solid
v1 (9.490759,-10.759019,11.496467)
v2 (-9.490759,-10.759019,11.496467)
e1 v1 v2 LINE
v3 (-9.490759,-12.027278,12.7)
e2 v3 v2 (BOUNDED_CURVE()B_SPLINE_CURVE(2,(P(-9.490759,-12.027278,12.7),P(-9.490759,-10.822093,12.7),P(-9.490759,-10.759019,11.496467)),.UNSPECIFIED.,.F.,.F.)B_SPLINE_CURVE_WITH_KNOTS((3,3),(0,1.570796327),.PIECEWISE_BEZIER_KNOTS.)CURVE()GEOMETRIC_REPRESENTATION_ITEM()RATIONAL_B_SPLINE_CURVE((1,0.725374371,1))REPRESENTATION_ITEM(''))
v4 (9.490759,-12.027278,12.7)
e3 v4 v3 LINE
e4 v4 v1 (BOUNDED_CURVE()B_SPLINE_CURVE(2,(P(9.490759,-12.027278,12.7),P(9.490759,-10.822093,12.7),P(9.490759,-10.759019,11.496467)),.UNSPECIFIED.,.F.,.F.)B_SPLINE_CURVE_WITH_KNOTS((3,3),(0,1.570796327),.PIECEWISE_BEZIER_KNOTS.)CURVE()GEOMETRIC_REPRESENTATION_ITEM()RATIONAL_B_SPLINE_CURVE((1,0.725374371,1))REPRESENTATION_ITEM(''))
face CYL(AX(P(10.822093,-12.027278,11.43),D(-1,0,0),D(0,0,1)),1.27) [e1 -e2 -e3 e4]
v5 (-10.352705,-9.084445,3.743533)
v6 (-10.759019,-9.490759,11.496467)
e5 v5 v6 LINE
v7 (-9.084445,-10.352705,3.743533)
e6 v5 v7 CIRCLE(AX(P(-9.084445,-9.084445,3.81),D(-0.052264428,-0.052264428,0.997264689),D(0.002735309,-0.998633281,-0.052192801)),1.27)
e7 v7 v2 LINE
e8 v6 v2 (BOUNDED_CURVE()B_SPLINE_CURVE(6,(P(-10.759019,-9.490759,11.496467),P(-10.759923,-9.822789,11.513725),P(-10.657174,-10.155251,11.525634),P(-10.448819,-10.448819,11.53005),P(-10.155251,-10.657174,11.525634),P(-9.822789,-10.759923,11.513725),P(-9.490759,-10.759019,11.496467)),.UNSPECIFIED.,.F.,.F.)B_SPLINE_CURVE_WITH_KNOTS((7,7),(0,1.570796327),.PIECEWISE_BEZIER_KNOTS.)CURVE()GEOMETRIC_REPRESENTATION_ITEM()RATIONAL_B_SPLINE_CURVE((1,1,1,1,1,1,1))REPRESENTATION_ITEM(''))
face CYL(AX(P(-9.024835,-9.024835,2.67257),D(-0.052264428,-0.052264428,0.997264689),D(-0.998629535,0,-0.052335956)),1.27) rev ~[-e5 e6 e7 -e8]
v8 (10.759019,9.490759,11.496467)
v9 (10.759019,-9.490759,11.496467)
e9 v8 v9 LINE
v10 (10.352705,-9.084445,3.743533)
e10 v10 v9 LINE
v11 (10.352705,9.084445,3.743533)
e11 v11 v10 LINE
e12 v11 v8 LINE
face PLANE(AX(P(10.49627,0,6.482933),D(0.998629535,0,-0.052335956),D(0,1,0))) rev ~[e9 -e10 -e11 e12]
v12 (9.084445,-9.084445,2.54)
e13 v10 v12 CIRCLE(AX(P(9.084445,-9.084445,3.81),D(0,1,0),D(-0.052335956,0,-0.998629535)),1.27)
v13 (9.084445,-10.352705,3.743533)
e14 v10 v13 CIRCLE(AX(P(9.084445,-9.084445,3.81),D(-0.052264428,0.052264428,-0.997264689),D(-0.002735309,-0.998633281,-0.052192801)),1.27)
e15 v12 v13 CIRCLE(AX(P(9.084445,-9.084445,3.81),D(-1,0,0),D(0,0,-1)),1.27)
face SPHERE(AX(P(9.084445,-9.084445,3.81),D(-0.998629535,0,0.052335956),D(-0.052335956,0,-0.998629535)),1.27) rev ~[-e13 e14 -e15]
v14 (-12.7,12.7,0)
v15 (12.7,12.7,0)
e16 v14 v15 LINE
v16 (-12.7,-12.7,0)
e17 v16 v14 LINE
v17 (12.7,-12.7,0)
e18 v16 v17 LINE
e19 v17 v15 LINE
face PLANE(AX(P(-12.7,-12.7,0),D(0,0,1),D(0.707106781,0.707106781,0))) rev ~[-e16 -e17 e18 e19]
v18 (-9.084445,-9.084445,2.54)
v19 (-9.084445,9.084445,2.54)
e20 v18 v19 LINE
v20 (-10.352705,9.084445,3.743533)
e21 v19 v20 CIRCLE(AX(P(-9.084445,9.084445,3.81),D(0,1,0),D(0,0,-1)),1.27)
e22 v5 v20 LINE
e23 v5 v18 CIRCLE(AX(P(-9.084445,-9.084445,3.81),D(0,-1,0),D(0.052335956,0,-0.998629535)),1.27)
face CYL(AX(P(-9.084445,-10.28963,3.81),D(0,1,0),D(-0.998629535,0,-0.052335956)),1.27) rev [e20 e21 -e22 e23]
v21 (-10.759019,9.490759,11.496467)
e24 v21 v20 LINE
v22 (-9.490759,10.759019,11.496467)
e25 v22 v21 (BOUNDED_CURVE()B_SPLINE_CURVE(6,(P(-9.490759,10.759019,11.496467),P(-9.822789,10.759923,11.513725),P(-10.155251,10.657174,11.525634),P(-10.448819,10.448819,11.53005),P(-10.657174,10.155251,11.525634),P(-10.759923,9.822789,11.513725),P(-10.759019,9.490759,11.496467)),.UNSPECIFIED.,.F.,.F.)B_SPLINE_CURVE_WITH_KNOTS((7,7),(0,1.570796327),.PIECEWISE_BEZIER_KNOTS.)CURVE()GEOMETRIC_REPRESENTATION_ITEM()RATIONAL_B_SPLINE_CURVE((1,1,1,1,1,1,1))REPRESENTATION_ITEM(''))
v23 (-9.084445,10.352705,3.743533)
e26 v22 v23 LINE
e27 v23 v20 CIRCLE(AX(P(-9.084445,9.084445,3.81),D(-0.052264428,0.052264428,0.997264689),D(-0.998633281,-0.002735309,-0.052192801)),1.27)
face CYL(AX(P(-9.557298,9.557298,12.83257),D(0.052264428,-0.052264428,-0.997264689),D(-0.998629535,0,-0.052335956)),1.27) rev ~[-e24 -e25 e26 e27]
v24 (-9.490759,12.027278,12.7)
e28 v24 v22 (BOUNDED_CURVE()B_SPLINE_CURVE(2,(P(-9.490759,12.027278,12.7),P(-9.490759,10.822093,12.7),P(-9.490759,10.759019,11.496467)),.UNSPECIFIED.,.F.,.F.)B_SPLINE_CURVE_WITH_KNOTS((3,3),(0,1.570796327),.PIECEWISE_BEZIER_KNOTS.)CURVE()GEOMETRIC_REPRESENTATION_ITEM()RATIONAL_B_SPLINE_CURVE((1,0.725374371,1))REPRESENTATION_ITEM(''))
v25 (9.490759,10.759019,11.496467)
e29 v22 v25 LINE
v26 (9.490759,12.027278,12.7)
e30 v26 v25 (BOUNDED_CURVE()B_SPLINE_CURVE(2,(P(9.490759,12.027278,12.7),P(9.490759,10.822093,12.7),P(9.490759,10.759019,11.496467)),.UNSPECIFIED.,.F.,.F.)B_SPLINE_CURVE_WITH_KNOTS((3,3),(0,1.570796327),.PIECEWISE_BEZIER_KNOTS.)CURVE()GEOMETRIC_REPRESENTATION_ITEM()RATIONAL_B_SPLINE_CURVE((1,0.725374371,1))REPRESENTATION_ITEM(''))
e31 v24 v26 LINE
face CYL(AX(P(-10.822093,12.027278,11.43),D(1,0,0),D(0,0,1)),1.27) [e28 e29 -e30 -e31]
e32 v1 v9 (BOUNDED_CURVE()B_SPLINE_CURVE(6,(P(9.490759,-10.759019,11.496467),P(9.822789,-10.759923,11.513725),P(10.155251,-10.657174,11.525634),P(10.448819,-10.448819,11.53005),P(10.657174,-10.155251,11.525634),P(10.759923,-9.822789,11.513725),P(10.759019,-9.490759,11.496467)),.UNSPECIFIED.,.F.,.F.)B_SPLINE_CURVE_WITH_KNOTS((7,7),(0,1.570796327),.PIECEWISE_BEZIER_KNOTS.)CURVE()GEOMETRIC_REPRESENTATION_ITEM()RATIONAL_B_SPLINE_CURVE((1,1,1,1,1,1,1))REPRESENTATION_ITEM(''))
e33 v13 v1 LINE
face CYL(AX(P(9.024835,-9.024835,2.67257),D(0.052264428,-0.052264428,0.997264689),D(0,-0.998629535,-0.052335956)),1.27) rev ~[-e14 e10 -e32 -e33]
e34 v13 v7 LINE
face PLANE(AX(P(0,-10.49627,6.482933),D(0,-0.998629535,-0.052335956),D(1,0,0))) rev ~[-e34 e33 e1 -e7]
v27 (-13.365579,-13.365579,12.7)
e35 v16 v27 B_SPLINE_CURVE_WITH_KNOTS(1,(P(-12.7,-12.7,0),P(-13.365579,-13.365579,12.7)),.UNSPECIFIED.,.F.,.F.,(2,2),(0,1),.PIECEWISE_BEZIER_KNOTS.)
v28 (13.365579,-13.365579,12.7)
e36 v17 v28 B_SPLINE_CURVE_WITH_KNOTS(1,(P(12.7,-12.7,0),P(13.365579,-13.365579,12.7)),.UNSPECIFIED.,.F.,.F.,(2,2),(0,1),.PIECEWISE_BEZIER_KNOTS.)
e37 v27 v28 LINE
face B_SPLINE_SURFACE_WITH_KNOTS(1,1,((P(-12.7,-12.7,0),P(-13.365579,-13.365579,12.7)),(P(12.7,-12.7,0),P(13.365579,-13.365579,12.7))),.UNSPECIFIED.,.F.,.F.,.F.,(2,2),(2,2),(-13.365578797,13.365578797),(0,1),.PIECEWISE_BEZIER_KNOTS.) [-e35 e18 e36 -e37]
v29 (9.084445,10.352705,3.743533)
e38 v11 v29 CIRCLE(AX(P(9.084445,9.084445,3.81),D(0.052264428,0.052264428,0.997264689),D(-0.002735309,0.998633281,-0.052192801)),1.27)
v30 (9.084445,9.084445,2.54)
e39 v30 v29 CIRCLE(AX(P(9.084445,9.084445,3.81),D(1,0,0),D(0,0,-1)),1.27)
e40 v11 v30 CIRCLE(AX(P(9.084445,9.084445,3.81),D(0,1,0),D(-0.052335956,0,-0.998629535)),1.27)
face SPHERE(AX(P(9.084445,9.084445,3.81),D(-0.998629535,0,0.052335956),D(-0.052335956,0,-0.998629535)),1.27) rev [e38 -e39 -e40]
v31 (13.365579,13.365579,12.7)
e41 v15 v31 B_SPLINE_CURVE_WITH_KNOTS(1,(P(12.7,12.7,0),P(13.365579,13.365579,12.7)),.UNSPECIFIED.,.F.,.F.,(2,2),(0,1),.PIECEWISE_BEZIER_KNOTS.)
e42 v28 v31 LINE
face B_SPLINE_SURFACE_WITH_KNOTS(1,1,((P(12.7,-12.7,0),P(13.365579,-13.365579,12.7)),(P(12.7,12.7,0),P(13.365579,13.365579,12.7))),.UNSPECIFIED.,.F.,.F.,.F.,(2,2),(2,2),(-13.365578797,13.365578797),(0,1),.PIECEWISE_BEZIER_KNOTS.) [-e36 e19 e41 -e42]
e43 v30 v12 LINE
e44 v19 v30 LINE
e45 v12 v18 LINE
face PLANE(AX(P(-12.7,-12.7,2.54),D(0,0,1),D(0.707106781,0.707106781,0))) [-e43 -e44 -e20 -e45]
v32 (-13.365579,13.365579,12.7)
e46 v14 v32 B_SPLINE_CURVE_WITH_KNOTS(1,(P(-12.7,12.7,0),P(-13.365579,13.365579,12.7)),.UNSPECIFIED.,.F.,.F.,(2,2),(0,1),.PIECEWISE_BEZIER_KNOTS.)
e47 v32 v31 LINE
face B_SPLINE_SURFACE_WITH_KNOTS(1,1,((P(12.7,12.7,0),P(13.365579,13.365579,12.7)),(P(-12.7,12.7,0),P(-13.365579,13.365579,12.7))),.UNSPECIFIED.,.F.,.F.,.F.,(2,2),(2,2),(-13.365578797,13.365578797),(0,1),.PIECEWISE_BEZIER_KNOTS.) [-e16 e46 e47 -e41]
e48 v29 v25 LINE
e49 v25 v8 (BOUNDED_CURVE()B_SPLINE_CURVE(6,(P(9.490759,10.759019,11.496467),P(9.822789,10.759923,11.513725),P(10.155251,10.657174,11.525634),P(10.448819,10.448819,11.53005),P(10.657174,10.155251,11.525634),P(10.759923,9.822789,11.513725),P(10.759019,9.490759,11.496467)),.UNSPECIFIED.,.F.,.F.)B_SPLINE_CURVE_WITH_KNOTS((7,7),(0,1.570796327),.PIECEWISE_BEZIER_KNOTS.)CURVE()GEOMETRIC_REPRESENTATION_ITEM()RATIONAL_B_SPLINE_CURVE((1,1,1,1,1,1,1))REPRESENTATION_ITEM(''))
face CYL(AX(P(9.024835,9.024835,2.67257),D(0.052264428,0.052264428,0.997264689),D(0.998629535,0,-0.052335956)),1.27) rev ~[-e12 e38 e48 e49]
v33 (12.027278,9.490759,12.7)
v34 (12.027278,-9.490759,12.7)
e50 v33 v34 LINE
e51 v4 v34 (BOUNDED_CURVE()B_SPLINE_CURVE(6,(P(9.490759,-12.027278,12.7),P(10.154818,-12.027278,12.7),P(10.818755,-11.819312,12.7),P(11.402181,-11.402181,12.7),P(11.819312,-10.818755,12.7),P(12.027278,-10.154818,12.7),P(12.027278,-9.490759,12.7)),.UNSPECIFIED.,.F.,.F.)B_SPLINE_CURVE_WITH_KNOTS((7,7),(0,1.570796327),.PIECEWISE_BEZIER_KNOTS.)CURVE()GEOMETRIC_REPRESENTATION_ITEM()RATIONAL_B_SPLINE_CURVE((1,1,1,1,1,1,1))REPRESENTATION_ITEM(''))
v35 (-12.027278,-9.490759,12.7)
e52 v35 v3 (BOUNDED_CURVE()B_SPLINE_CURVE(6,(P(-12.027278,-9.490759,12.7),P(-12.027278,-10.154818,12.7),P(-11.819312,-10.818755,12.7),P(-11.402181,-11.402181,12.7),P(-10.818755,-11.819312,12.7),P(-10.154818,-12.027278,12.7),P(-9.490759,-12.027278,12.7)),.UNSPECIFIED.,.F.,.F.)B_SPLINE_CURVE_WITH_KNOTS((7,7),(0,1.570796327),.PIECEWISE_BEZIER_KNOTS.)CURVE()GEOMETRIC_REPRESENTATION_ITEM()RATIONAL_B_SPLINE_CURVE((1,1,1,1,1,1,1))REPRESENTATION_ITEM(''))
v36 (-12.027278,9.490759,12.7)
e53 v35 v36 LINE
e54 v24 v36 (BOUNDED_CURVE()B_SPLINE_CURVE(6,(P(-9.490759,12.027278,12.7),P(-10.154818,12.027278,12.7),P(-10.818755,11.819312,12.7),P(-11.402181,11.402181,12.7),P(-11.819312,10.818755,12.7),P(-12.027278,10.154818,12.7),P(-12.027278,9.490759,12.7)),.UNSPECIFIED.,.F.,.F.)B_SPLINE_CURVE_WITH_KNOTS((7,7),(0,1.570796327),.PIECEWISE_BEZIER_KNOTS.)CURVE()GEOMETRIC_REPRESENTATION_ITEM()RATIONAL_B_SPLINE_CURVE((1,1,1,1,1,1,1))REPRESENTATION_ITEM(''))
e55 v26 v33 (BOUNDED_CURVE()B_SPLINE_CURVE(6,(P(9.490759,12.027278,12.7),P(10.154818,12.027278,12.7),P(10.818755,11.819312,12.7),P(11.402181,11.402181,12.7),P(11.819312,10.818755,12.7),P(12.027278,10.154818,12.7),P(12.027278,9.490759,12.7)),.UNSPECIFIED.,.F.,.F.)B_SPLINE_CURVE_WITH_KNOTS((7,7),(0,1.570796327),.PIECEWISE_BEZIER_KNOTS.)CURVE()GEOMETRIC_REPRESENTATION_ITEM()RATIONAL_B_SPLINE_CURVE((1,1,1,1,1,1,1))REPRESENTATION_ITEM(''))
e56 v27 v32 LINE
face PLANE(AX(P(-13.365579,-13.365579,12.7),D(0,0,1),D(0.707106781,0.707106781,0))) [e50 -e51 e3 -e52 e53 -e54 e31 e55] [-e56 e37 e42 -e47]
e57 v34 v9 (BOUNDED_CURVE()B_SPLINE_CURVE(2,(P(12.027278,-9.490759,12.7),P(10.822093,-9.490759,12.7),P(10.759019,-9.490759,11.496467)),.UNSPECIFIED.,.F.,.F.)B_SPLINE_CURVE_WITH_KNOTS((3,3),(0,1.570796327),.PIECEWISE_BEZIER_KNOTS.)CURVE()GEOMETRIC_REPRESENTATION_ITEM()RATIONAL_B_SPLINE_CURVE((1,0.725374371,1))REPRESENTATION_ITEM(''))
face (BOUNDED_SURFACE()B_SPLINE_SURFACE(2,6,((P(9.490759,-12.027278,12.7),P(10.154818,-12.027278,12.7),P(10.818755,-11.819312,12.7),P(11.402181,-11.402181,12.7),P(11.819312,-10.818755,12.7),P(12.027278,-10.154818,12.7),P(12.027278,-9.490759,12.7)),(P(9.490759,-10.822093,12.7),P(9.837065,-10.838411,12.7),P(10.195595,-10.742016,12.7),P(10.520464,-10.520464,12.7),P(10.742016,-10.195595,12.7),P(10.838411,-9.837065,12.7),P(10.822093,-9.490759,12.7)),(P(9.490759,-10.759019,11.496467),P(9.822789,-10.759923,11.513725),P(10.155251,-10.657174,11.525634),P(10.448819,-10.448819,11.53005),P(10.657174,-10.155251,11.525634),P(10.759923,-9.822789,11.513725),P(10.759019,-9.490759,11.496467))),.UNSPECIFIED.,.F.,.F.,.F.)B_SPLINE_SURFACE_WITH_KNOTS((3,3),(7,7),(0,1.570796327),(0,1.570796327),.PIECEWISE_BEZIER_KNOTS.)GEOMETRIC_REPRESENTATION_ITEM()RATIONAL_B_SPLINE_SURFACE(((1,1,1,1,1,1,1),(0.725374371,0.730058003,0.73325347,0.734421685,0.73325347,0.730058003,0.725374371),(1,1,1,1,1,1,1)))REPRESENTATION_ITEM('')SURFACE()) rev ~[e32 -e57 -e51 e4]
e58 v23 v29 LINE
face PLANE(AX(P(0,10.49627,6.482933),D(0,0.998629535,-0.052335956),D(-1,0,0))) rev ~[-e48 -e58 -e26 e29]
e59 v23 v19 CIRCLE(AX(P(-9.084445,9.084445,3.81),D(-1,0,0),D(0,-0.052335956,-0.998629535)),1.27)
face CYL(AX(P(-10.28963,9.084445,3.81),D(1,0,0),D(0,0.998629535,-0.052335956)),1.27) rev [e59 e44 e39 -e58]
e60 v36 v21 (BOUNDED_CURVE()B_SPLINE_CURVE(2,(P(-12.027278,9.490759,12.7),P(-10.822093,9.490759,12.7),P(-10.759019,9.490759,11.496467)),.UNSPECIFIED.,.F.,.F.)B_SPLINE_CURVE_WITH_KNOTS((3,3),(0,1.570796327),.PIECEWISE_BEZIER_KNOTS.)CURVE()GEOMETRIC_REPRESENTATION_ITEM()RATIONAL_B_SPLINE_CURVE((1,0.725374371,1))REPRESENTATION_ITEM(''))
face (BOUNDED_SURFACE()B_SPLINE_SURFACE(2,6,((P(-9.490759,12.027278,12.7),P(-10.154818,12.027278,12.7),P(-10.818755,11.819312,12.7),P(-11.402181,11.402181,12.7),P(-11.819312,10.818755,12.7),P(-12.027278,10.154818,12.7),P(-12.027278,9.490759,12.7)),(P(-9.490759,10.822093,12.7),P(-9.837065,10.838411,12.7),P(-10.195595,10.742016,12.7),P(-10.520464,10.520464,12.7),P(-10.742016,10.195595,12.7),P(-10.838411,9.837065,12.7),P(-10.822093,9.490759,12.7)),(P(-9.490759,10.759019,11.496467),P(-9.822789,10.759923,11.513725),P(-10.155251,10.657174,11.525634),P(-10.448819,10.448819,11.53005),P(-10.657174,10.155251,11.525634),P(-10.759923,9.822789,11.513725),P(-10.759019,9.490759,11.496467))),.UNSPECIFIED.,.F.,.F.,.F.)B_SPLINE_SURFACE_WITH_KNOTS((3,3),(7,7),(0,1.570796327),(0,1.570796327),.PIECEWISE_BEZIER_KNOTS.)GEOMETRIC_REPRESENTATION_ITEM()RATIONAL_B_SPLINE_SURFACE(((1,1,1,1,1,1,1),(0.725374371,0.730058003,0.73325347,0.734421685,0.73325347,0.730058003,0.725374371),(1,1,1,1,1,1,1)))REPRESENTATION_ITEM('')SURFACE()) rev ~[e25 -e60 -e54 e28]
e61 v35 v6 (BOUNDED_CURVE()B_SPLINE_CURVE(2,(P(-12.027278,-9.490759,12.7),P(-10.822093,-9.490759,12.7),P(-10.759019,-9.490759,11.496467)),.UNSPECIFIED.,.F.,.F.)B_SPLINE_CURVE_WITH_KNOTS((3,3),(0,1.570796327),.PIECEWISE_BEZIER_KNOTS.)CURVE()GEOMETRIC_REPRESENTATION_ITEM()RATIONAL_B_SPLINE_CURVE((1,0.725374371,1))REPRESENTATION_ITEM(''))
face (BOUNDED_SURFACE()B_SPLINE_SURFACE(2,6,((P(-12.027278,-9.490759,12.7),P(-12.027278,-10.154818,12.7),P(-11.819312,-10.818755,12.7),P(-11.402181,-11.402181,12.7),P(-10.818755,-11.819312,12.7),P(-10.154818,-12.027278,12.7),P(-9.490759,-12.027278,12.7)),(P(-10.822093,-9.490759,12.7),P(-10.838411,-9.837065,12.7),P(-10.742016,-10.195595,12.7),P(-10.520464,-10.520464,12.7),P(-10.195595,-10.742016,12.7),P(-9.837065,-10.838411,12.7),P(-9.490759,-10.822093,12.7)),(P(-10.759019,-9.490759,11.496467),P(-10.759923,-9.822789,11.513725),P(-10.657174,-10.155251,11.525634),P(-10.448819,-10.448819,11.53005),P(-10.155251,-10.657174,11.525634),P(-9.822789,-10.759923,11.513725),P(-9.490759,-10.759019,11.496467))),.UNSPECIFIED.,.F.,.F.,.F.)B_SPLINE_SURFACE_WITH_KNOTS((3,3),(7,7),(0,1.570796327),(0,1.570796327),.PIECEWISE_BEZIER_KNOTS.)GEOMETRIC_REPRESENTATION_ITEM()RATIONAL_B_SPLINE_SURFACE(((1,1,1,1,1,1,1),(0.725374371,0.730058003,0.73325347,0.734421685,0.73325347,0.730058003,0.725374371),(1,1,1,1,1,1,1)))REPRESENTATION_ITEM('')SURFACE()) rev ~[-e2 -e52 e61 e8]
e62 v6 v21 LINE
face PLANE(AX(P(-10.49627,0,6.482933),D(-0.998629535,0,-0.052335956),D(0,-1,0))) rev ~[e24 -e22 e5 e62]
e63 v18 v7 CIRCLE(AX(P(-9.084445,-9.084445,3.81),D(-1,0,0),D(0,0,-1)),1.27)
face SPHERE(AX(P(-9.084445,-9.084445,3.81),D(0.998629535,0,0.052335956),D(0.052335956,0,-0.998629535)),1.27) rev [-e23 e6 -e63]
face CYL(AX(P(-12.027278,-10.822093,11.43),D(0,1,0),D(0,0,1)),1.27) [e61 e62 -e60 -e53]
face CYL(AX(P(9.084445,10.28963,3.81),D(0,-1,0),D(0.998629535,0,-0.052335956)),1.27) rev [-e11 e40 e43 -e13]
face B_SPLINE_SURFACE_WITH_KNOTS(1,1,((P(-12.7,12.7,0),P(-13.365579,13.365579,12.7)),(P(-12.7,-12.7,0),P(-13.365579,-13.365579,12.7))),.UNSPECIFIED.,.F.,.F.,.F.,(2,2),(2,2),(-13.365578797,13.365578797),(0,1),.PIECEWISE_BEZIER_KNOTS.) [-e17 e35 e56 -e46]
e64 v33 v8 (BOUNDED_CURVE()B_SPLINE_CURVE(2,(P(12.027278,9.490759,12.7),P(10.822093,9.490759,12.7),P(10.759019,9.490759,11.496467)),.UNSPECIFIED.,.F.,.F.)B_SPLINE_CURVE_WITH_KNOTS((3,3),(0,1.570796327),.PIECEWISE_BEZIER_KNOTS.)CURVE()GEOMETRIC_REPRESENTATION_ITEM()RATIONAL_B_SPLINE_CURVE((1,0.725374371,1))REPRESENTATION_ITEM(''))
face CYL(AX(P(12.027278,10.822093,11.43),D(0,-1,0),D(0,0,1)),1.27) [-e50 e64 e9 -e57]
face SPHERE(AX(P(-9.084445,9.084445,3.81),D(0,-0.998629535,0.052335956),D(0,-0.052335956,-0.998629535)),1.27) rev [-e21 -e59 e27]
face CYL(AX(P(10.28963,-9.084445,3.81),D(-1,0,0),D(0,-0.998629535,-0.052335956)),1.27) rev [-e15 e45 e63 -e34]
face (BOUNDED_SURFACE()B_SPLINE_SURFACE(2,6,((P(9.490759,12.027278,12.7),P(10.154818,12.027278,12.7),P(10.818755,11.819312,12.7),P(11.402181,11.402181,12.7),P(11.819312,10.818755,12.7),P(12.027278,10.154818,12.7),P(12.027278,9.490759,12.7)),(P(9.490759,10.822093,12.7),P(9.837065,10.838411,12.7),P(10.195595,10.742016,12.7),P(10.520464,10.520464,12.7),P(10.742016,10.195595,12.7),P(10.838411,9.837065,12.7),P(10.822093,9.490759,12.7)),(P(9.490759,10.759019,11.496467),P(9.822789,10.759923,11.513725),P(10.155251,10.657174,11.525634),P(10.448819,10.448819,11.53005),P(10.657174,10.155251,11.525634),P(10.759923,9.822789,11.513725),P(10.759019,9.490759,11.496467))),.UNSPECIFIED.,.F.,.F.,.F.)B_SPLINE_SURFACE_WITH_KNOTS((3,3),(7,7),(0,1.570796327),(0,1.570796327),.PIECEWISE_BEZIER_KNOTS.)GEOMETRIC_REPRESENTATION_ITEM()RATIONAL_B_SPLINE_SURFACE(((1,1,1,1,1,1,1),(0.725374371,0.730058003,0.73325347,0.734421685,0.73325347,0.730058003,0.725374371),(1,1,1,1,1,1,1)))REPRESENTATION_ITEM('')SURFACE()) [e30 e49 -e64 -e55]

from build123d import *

# Parameters (mm, degrees)
F0_W     = 25.4
F0_H     = 25.4
F1_DEPTH = 12.7
F1_TAPER = -3
F2_T     = -2.54
F3_R     = 1.27


with BuildPart() as f1:
    # F0 (on Top) → F1 (new body)
    with BuildSketch(Plane.XY):
        Rectangle(F0_W, F0_H)
    extrude(amount=F1_DEPTH, taper=F1_TAPER)

    # F2
    f2_openings = [f1.faces().sort_by_distance(p)[0] for p in [
        (0, 0, 12.7),
    ]]
    offset(amount=F2_T, openings=f2_openings)

    # F3
    f3_edges = [f1.edges().sort_by_distance(p)[0] for p in [
        (0, -10.28963, 2.54),
        (-10.28963, 0, 2.54),
        (0, 10.28963, 2.54),
        (10.28963, 0, 2.54),
        (0, 10.822093, 12.7),
        (-10.822093, 0, 12.7),
        (0, -10.822093, 12.7),
        (10.822093, 0, 12.7),
        (-10.555862, -10.555862, 7.62),
        (10.555862, -10.555862, 7.62),
        (10.555862, 10.555862, 7.62),
        (-10.555862, 10.555862, 7.62),
    ]]
    fillet(f3_edges, radius=F3_R)


solid = f1.part
